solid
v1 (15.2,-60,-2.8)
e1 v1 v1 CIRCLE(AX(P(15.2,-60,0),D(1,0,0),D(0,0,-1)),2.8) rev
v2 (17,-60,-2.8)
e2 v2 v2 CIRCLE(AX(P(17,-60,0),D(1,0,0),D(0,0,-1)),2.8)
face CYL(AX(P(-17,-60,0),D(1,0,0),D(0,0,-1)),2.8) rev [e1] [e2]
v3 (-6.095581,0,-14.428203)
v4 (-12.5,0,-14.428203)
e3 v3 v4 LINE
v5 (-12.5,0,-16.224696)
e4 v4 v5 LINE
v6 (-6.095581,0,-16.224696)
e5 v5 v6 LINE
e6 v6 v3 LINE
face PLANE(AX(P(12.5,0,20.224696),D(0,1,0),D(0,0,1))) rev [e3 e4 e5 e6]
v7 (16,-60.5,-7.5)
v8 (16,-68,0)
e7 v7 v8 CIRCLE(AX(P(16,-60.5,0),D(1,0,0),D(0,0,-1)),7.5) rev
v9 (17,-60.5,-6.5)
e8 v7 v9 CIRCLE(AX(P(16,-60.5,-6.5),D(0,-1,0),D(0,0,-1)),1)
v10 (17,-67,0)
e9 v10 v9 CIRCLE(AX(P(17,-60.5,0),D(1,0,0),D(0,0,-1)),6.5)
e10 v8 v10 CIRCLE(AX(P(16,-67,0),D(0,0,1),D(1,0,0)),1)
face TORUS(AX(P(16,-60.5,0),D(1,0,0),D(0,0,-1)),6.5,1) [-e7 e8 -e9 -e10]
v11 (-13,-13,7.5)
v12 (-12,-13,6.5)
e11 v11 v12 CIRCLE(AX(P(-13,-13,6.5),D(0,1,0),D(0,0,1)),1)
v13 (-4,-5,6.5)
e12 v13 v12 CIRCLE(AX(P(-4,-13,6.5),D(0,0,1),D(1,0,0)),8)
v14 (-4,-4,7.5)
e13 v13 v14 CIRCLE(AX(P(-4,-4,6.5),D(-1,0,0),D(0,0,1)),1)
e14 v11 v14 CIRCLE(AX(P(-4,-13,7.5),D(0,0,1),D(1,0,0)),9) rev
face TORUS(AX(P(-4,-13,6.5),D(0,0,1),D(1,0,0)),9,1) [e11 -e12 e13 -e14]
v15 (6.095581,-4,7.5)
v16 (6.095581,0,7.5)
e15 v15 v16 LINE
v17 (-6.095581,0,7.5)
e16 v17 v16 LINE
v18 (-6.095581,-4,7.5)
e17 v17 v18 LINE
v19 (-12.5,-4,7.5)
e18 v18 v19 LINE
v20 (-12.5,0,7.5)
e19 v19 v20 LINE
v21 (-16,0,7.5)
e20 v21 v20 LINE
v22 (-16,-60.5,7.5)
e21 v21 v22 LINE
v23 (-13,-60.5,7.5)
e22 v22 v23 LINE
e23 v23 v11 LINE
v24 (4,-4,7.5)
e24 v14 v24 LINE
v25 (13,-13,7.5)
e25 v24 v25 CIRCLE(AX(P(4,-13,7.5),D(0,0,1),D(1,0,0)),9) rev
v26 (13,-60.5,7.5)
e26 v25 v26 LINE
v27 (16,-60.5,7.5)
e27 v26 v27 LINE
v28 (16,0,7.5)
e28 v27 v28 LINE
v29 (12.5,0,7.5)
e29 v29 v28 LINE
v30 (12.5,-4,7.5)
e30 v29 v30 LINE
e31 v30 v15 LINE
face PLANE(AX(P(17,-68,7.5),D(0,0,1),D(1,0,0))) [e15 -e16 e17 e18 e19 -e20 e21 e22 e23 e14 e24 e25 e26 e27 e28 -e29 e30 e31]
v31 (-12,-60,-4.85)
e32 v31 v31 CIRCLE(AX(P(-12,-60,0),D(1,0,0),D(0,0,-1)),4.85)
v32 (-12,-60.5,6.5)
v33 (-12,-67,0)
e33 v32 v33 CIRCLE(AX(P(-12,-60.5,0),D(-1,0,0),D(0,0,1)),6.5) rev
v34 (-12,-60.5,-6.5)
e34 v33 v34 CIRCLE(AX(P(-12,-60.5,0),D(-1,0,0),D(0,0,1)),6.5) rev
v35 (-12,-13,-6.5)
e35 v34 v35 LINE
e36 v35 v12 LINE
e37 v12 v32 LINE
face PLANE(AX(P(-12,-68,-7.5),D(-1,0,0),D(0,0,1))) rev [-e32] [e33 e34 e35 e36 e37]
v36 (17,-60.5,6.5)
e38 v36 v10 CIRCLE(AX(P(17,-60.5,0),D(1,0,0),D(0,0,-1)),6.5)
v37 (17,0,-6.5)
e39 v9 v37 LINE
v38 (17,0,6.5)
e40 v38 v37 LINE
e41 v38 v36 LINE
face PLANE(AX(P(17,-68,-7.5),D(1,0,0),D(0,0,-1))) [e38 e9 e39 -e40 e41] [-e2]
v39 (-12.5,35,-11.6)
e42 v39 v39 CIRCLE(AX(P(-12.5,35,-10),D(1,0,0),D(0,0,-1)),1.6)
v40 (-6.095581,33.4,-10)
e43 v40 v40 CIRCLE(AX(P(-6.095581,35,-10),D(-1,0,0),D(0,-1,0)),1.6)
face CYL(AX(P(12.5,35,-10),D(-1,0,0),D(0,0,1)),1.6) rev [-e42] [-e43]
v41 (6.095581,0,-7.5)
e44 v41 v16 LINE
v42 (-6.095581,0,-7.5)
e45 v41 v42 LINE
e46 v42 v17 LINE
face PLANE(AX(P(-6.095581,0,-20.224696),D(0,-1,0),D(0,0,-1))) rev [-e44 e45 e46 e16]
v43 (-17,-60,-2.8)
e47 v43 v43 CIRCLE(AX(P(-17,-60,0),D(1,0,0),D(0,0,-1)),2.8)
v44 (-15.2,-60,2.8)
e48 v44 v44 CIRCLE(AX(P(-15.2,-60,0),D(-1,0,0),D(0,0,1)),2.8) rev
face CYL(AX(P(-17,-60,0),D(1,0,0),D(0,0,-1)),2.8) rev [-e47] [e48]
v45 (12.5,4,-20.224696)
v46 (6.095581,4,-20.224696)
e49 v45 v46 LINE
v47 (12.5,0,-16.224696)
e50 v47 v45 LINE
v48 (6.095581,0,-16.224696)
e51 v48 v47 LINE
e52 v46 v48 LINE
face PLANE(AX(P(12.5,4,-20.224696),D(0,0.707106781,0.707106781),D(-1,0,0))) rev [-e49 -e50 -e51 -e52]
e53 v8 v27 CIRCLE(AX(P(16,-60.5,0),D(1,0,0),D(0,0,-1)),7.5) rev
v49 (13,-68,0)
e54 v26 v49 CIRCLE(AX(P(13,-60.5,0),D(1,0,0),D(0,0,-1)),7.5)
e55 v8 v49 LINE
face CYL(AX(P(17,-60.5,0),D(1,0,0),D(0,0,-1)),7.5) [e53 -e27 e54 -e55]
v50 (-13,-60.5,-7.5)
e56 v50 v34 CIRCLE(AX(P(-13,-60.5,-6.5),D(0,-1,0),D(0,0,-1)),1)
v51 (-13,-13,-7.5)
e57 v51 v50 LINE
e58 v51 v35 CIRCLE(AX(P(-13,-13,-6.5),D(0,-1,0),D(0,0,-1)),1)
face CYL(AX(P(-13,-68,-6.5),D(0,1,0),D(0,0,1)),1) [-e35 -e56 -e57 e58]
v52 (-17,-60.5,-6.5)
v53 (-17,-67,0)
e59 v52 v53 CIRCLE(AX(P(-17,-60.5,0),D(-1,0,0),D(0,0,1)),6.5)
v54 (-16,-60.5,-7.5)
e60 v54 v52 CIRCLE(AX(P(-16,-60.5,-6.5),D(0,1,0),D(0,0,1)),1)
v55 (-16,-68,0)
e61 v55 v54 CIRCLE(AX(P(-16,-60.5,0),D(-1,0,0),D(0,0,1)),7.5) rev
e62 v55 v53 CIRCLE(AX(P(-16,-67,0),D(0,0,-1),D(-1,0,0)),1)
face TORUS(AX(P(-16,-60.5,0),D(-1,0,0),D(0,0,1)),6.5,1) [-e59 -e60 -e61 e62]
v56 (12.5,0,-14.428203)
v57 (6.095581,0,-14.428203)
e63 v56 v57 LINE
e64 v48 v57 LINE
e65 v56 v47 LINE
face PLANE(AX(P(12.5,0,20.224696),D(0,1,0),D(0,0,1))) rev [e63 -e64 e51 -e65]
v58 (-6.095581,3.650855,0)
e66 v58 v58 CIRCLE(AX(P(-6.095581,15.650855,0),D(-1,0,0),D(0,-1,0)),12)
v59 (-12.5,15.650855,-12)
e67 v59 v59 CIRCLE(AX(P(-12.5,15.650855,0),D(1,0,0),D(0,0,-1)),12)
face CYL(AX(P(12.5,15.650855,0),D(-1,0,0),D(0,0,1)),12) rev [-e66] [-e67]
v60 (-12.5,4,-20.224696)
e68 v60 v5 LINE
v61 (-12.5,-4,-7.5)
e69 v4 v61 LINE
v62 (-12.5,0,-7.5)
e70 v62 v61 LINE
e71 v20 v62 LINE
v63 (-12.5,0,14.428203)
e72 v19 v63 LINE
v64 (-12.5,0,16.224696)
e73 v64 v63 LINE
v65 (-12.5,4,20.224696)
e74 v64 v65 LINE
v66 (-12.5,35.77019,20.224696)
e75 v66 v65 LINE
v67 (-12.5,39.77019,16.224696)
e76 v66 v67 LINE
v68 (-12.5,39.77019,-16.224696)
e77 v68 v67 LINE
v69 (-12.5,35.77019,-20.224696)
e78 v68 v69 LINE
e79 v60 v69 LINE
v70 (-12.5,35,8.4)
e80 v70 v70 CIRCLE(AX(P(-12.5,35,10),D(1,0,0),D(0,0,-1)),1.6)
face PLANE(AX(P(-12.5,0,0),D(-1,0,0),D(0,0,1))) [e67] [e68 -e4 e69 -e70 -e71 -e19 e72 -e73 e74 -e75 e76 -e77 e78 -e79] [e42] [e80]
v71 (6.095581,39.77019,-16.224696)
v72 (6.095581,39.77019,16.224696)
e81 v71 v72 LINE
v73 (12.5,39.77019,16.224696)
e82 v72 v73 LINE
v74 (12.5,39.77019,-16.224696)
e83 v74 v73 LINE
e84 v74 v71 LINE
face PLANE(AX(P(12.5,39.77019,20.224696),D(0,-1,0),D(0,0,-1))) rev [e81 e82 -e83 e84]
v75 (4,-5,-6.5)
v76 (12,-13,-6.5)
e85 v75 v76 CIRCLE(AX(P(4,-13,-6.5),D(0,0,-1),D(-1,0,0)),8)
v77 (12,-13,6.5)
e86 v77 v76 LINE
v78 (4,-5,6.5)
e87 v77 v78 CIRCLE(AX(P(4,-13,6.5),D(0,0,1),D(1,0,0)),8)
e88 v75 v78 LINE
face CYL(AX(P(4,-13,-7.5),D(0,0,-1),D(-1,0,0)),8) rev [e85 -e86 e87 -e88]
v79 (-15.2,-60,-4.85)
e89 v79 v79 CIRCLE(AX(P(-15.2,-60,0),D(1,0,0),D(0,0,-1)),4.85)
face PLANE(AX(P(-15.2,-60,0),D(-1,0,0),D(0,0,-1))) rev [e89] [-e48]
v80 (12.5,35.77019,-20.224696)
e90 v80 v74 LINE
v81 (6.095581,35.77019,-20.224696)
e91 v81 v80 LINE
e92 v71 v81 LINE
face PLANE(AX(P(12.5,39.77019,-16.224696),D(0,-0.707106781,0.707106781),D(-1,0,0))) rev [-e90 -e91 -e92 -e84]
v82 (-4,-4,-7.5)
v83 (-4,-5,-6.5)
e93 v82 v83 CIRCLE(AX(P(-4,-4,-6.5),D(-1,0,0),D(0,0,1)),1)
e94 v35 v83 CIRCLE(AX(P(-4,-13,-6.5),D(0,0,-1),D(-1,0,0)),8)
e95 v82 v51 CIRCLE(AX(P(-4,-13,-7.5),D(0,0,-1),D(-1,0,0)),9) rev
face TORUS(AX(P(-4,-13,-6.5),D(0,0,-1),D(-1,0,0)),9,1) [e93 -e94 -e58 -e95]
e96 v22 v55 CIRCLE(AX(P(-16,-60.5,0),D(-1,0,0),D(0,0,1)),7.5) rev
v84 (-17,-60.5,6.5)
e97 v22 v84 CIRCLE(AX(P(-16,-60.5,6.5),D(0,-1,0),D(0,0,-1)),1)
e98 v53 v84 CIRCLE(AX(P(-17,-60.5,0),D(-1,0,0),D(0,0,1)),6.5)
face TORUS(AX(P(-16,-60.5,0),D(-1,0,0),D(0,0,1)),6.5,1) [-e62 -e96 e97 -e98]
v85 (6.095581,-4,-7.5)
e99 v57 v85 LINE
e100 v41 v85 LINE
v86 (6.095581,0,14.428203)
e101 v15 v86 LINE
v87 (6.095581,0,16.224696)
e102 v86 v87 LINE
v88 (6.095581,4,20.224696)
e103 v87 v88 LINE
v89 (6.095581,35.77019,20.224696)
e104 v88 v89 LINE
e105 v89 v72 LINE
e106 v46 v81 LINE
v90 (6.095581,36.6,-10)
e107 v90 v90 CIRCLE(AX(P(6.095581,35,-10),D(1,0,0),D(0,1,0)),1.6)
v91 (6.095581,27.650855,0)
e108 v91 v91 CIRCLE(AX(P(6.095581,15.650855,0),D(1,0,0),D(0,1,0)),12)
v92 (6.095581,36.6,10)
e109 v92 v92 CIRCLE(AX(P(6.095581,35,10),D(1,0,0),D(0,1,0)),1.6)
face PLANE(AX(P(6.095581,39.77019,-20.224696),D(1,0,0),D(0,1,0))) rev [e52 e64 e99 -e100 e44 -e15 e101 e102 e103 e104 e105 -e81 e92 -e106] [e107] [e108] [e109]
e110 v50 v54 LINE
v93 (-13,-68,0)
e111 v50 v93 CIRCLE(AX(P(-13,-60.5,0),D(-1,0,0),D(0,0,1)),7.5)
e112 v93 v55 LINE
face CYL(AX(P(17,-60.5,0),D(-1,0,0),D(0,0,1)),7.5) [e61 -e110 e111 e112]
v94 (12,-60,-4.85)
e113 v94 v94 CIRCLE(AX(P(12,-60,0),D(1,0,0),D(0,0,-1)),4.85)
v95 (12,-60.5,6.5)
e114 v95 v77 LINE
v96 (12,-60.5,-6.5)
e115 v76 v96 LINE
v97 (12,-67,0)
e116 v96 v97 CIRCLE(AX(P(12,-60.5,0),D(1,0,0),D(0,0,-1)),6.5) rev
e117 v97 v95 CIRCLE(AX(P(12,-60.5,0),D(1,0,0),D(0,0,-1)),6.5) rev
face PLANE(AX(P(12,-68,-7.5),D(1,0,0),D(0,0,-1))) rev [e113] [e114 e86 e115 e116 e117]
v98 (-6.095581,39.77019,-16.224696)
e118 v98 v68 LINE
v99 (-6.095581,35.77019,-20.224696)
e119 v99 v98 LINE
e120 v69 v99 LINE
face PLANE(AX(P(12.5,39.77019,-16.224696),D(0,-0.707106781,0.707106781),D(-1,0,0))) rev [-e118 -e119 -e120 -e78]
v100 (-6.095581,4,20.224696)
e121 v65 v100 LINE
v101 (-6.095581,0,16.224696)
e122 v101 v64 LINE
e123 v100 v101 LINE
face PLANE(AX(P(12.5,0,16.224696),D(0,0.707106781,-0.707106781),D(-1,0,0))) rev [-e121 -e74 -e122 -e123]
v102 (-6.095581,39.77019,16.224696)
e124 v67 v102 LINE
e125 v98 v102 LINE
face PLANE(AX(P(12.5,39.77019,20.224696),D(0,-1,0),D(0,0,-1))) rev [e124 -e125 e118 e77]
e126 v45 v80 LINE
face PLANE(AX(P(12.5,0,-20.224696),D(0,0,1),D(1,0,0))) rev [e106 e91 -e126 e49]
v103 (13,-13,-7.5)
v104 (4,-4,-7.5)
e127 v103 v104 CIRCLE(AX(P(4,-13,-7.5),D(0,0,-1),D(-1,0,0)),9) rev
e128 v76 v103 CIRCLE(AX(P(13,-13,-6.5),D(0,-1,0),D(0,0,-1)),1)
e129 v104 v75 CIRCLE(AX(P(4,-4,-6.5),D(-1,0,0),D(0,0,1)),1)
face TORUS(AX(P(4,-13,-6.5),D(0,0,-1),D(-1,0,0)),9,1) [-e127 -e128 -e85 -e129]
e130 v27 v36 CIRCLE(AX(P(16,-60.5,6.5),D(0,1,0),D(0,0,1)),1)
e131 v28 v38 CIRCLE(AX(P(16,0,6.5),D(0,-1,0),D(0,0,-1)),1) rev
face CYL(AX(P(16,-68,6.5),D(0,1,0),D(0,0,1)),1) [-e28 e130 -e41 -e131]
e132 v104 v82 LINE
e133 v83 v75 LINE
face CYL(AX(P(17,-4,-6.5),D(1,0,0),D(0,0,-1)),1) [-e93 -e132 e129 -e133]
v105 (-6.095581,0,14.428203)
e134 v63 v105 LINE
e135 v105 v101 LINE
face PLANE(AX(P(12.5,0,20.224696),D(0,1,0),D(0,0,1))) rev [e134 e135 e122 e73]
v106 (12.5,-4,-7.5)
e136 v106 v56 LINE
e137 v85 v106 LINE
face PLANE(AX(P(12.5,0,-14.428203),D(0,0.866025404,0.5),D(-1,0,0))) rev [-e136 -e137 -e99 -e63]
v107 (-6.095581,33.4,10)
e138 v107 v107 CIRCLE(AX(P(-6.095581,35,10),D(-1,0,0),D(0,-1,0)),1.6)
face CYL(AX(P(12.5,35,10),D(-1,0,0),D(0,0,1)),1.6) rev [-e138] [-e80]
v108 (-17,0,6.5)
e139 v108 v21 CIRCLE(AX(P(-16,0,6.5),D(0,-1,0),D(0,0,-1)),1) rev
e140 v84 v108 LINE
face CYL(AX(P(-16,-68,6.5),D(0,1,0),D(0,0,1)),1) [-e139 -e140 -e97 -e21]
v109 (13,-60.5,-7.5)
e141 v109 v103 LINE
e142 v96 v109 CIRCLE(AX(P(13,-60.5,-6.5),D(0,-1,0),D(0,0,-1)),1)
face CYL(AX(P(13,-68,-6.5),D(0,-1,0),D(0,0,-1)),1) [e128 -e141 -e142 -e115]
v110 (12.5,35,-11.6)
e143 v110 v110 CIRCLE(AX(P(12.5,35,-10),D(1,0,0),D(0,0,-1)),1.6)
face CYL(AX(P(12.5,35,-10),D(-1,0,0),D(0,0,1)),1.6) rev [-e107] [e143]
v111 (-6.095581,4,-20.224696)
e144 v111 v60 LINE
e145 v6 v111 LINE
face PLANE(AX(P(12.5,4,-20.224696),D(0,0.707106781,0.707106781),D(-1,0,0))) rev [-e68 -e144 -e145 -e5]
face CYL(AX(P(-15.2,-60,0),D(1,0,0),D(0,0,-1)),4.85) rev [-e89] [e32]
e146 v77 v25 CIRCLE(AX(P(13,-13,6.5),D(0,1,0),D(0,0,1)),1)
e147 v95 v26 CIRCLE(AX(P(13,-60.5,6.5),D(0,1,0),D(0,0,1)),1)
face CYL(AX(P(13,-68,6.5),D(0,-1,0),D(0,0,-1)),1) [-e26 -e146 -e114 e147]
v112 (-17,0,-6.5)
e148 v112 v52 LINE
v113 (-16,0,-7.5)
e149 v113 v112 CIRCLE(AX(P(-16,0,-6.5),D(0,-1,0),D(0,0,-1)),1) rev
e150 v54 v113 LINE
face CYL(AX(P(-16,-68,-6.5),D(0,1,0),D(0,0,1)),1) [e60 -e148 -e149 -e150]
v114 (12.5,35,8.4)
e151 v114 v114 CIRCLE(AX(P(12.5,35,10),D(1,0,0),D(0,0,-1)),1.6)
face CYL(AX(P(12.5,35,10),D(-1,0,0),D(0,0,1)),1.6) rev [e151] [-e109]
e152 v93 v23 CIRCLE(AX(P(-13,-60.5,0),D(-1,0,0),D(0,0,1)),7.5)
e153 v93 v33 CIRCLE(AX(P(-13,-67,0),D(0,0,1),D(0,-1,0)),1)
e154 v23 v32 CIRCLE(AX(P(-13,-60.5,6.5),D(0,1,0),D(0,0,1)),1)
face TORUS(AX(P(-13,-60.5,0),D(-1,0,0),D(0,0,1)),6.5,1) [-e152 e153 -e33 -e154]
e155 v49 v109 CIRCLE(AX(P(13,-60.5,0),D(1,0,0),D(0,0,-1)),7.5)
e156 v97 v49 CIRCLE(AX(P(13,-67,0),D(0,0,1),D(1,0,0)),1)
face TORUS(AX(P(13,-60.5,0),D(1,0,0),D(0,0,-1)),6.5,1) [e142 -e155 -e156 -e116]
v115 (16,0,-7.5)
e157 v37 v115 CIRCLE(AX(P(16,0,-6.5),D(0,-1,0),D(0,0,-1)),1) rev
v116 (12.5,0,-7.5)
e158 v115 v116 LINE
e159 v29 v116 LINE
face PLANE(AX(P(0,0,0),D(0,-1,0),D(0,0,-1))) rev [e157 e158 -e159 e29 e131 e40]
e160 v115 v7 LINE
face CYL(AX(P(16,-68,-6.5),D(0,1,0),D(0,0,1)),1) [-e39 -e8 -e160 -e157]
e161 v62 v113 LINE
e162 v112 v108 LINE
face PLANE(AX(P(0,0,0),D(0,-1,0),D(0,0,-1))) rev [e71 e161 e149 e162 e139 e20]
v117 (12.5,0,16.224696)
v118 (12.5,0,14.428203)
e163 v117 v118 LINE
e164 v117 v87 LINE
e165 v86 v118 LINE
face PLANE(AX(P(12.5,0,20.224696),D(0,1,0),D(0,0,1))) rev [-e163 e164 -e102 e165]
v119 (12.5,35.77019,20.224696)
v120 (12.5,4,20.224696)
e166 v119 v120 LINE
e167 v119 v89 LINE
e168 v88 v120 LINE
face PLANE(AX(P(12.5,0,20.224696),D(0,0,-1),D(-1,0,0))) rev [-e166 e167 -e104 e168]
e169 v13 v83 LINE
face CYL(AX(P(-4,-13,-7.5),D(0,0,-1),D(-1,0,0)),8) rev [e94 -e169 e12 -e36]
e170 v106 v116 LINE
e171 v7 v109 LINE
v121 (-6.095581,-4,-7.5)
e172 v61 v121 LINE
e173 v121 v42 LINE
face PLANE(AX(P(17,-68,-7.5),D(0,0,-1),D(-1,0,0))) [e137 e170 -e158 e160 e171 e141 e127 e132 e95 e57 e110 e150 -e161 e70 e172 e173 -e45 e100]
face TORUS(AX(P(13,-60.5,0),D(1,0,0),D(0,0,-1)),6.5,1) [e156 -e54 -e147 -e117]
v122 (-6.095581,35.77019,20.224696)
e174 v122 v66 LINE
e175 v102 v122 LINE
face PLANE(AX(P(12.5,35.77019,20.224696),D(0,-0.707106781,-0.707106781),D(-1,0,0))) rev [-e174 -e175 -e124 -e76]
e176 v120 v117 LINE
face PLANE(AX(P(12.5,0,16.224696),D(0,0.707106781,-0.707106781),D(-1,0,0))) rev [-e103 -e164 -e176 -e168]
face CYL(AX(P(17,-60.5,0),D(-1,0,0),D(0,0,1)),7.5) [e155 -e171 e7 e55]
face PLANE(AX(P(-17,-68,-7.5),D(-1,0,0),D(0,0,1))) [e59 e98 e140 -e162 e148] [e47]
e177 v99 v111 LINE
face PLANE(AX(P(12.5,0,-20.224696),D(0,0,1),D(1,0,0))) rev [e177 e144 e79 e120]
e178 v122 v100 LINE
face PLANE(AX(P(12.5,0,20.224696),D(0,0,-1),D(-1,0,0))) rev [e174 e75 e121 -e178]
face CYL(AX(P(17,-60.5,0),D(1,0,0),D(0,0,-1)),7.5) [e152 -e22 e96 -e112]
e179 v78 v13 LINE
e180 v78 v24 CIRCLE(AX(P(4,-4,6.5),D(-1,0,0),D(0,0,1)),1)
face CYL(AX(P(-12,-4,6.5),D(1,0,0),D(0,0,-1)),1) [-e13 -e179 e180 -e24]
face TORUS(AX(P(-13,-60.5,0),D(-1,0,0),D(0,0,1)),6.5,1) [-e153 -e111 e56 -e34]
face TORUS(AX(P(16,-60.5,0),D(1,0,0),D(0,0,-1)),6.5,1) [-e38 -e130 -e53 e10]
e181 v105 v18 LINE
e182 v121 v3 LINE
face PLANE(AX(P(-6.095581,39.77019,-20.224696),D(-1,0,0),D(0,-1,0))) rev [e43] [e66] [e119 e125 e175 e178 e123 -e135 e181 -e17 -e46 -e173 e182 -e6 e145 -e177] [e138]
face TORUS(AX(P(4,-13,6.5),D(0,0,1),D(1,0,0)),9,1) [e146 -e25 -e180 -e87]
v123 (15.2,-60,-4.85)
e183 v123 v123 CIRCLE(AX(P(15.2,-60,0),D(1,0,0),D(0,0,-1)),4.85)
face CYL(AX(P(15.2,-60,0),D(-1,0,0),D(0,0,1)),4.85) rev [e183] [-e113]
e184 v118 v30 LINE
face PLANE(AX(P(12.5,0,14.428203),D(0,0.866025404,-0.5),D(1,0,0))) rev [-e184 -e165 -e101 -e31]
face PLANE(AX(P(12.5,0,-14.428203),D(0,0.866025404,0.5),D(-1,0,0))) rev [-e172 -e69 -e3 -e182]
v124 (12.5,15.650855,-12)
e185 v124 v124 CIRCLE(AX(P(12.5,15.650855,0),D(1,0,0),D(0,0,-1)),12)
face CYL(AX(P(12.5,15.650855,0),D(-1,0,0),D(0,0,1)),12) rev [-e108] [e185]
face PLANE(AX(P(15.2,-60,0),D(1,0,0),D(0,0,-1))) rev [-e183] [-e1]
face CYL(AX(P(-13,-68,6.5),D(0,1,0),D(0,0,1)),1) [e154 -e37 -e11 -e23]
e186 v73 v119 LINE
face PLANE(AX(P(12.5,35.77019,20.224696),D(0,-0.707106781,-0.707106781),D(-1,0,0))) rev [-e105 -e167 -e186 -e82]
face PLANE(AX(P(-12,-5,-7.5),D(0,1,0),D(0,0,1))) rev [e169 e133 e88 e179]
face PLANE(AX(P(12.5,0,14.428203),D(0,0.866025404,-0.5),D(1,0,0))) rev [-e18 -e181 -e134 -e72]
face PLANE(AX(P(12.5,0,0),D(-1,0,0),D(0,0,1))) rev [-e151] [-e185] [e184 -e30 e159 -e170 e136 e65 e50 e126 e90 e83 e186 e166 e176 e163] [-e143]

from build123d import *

# Parameters (mm, degrees)
SKETCH_1_W          = 34
SKETCH_1_H          = 15
EXTRUDE_1_DEPTH     = 68
SKETCH_3_W          = 24
SKETCH_3_H          = 63
CUT_EXTRUDE_1_DEPTH = 72.67984375
FILLET_1_R          = 8
FILLET_3_R          = 7.5
FILLET_2_R          = 1
SKETCH_4_R          = 2.8
CUT_EXTRUDE_2_DEPTH = 77.395353351
SKETCH_6_R          = 4.85
CUT_EXTRUDE_4_DEPTH = 3.2
SKETCH_7_W          = 40.44939287
SKETCH_7_H          = 39.770190269
SKETCH_7_R          = 12
SKETCH_7_R_2        = 1.6
EXTRUDE_2_DEPTH     = 12.5
SKETCH_8_W          = 12.191161996
SKETCH_8_H          = 39.770190269
CUT_EXTRUDE_5_DEPTH = 81.926839783
CHAMFER_1_SIZE      = 4
CHAMFER_1_SIZE_2    = 6.92820323
CHAMFER_2_SIZE      = 4


# Some blends are built 0.0001 mm under size
with BuildPart() as part:
    # 草图1 → 凸台-拉伸1 (new body)
    with BuildSketch(Plane(origin=(0, 0, 0), x_dir=(1, 0, 0), z_dir=(0, 1, 0))):
        Rectangle(SKETCH_1_W, SKETCH_1_H)
    extrude(amount=-EXTRUDE_1_DEPTH)

    # 草图3 → 切除-拉伸1 (cut, through all)
    with BuildSketch(Plane.XY.offset(7.5)):
        with Locations((0, -36.5)):
            Rectangle(SKETCH_3_W, SKETCH_3_H)
    extrude(amount=-CUT_EXTRUDE_1_DEPTH, mode=Mode.SUBTRACT)

    # 圆角1
    fillet_1_edges = [part.edges().sort_by_distance(p)[0] for p in [
        (-12, -5, 0),
        (12, -5, 0),
    ]]
    fillet(fillet_1_edges, radius=FILLET_1_R)

    # 圆角3
    fillet_3_edges = [part.edges().sort_by_distance(p)[0] for p in [
        (14.5, -68, -7.5),
        (14.5, -68, 7.5),
        (-14.5, -68, -7.5),
        (-14.5, -68, 7.5),
    ]]
    fillet(fillet_3_edges, radius=FILLET_3_R - 0.0001)  # a hair under: the kernel refuses the full size

    # 圆角2
    fillet_2_edges = [part.edges().sort_by_distance(p)[0] for p in [
        (0, -5, 7.5),
        (0, -5, -7.5),
        (-12, -36.75005, 7.5),
        (-12, -36.75005, -7.5),
        (9.656854249, -7.343145751, 7.5),
        (9.656854249, -7.343145751, -7.5),
        (-9.656854249, -7.343145751, 7.5),
        (-9.656854249, -7.343145751, -7.5),
        (-17, -30.25005, -7.5),
        (17, -30.25005, -7.5),
        (12, -36.75005, -7.5),
        (12, -36.75005, 7.5),
        (12, -65.803330148, 5.303330148),
        (12, -65.803330148, -5.303330148),
        (17, -30.25005, 7.5),
        (17, -65.803330148, 5.303330148),
        (17, -65.803330148, -5.303330148),
        (-17, -30.25005, 7.5),
        (-17, -65.803330148, 5.303330148),
        (-17, -65.803330148, -5.303330148),
        (-12, -65.803330148, 5.303330148),
        (-12, -65.803330148, -5.303330148),
    ]]
    fillet(fillet_2_edges, radius=FILLET_2_R)

    # 草图4 → 切除-拉伸2 (cut, through all)
    with BuildSketch(Plane(origin=(17, 0, 0), x_dir=(0, 0, -1), z_dir=(1, 0, 0))):
        with Locations((0, -60)):
            Circle(SKETCH_4_R)
    extrude(amount=-CUT_EXTRUDE_2_DEPTH, mode=Mode.SUBTRACT)

    # 草图6 → 切除-拉伸4 (cut)
    with BuildSketch(Plane(origin=(12, 0, 0), x_dir=(0, 0, -1), z_dir=(1, 0, 0))):
        with Locations((0, -60)):
            Circle(SKETCH_6_R)
    cut_extrude_4 = extrude(amount=CUT_EXTRUDE_4_DEPTH, mode=Mode.SUBTRACT)

    # 镜向1: 切除-拉伸4 across plane
    add(cut_extrude_4.mirror(Plane(origin=(0, 0, 0), x_dir=(0, 0, 1), z_dir=(1, 0, 0))), mode=Mode.SUBTRACT)

    # 草图7 → 凸台-拉伸2 (add, symmetric)
    with BuildSketch(Plane(origin=(0, 0, 0), x_dir=(0, 0, -1), z_dir=(1, 0, 0))):
        with Locations((0, 19.885095135)):
            Rectangle(SKETCH_7_W, SKETCH_7_H)
        with Locations((0, 15.650854712)):
            Circle(SKETCH_7_R, mode=Mode.SUBTRACT)
        with Locations((-10, 35)):
            Circle(SKETCH_7_R_2, mode=Mode.SUBTRACT)
        with Locations((10, 35)):
            Circle(SKETCH_7_R_2, mode=Mode.SUBTRACT)
    extrude(amount=EXTRUDE_2_DEPTH, both=True)

    # 草图8 → 切除-拉伸5 (cut, through all)
    with BuildSketch(Plane.XY.offset(20.224696435)):
        with Locations((0, 19.885095135)):
            Rectangle(SKETCH_8_W, SKETCH_8_H)
    extrude(amount=-CUT_EXTRUDE_5_DEPTH, mode=Mode.SUBTRACT)

    # 倒角1
    # the kernel refuses this chamfer: 6.92820323, 4 mm, written as the material it adds along each edge
    with BuildSketch(Plane(origin=(-12.5, 0, 7.5), x_dir=(0, -0.9983227437537926, -0.057893862402671484), z_dir=(1, 0, 0)), Plane(origin=(6.095580998, 0, 7.5), x_dir=(0, -0.9983227437537926, -0.057893862402671484), z_dir=(1, 0, 0)), Plane(origin=(12.5, 0, -7.5), x_dir=(0, -0.9983227437537926, 0.057893862402671484), z_dir=(-1, 0, 0)), Plane(origin=(-6.095580998, 0, -7.5), x_dir=(0, -0.9983227437537926, 0.057893862402671484), z_dir=(-1, 0, 0))) as chamfer_1_piece_1:
        Polygon((CHAMFER_1_SIZE * 0.998322743754, -CHAMFER_1_SIZE * 0.0578938624027), (-CHAMFER_1_SIZE_2 * 0.057893862405, -CHAMFER_1_SIZE_2 * 0.998322743793), (0, 0), align=None)
    extrude(amount=6.404419002)
    with BuildSketch(Plane(origin=(-30.423855882, 0, 7.5), x_dir=(0, -0.9983227437537926, -0.057893862402671484), z_dir=(1, 0, 0))) as chamfer_1_piece_2_section:
        Polygon((CHAMFER_1_SIZE * 0.998322743754, -CHAMFER_1_SIZE * 0.0578938624027), (-CHAMFER_1_SIZE_2 * 0.057893862405, -CHAMFER_1_SIZE_2 * 0.998322743793), (0, 0), align=None)
    chamfer_1_piece_2 = extrude(amount=42.252130767, mode=Mode.PRIVATE)
    chamfer_1_piece_2 = split(chamfer_1_piece_2, bisect_by=Plane(origin=(6.095580998, -1.333333333, 9.809401077), z_dir=(1, 0, 0)), keep=Keep.TOP, mode=Mode.PRIVATE)
    add(chamfer_1_piece_2)
    with BuildSketch(Plane(origin=(-11.828274885, 0, 7.5), x_dir=(0, -0.9983227437537926, -0.057893862402671484), z_dir=(1, 0, 0))) as chamfer_1_piece_3_section:
        Polygon((CHAMFER_1_SIZE * 0.998322743754, -CHAMFER_1_SIZE * 0.0578938624027), (-CHAMFER_1_SIZE_2 * 0.057893862405, -CHAMFER_1_SIZE_2 * 0.998322743793), (0, 0), align=None)
    chamfer_1_piece_3 = extrude(amount=42.252130767, mode=Mode.PRIVATE)
    chamfer_1_piece_3 = split(chamfer_1_piece_3, bisect_by=Plane(origin=(-6.095580998, -1.333333333, 9.809401077), z_dir=(-1, 0, 0)), keep=Keep.TOP, mode=Mode.PRIVATE)
    add(chamfer_1_piece_3)
    with BuildSketch(Plane(origin=(30.423855882, 0, -7.5), x_dir=(0, -0.9983227437537926, 0.057893862402671484), z_dir=(-1, 0, 0))) as chamfer_1_piece_4_section:
        Polygon((CHAMFER_1_SIZE * 0.998322743754, -CHAMFER_1_SIZE * 0.0578938624027), (-CHAMFER_1_SIZE_2 * 0.057893862405, -CHAMFER_1_SIZE_2 * 0.998322743793), (0, 0), align=None)
    chamfer_1_piece_4 = extrude(amount=42.252130767, mode=Mode.PRIVATE)
    chamfer_1_piece_4 = split(chamfer_1_piece_4, bisect_by=Plane(origin=(-6.095580998, -1.333333333, -9.809401077), z_dir=(-1, 0, 0)), keep=Keep.TOP, mode=Mode.PRIVATE)
    add(chamfer_1_piece_4)
    with BuildSketch(Plane(origin=(11.828274885, 0, -7.5), x_dir=(0, -0.9983227437537926, 0.057893862402671484), z_dir=(-1, 0, 0))) as chamfer_1_piece_5_section:
        Polygon((CHAMFER_1_SIZE * 0.998322743754, -CHAMFER_1_SIZE * 0.0578938624027), (-CHAMFER_1_SIZE_2 * 0.057893862405, -CHAMFER_1_SIZE_2 * 0.998322743793), (0, 0), align=None)
    chamfer_1_piece_5 = extrude(amount=42.252130767, mode=Mode.PRIVATE)
    chamfer_1_piece_5 = split(chamfer_1_piece_5, bisect_by=Plane(origin=(6.095580998, -1.333333333, -9.809401077), z_dir=(1, 0, 0)), keep=Keep.TOP, mode=Mode.PRIVATE)
    add(chamfer_1_piece_5)

    # 倒角2
    chamfer_2_edges = [part.edges().sort_by_distance(p)[0] for p in [
        (9.297790499, 0, 20.224696435),
        (9.297790499, 39.770190269, 20.224696435),
        (9.297790499, 0, -20.224696435),
        (9.297790499, 39.770190269, -20.224696435),
        (-9.297790499, 39.770190269, 20.224696435),
        (-9.297790499, 39.770190269, -20.224696435),
        (-9.297790499, 0, -20.224696435),
        (-9.297790499, 0, 20.224696435),
    ]]
    chamfer(chamfer_2_edges, length=CHAMFER_2_SIZE)


solid = part.part
